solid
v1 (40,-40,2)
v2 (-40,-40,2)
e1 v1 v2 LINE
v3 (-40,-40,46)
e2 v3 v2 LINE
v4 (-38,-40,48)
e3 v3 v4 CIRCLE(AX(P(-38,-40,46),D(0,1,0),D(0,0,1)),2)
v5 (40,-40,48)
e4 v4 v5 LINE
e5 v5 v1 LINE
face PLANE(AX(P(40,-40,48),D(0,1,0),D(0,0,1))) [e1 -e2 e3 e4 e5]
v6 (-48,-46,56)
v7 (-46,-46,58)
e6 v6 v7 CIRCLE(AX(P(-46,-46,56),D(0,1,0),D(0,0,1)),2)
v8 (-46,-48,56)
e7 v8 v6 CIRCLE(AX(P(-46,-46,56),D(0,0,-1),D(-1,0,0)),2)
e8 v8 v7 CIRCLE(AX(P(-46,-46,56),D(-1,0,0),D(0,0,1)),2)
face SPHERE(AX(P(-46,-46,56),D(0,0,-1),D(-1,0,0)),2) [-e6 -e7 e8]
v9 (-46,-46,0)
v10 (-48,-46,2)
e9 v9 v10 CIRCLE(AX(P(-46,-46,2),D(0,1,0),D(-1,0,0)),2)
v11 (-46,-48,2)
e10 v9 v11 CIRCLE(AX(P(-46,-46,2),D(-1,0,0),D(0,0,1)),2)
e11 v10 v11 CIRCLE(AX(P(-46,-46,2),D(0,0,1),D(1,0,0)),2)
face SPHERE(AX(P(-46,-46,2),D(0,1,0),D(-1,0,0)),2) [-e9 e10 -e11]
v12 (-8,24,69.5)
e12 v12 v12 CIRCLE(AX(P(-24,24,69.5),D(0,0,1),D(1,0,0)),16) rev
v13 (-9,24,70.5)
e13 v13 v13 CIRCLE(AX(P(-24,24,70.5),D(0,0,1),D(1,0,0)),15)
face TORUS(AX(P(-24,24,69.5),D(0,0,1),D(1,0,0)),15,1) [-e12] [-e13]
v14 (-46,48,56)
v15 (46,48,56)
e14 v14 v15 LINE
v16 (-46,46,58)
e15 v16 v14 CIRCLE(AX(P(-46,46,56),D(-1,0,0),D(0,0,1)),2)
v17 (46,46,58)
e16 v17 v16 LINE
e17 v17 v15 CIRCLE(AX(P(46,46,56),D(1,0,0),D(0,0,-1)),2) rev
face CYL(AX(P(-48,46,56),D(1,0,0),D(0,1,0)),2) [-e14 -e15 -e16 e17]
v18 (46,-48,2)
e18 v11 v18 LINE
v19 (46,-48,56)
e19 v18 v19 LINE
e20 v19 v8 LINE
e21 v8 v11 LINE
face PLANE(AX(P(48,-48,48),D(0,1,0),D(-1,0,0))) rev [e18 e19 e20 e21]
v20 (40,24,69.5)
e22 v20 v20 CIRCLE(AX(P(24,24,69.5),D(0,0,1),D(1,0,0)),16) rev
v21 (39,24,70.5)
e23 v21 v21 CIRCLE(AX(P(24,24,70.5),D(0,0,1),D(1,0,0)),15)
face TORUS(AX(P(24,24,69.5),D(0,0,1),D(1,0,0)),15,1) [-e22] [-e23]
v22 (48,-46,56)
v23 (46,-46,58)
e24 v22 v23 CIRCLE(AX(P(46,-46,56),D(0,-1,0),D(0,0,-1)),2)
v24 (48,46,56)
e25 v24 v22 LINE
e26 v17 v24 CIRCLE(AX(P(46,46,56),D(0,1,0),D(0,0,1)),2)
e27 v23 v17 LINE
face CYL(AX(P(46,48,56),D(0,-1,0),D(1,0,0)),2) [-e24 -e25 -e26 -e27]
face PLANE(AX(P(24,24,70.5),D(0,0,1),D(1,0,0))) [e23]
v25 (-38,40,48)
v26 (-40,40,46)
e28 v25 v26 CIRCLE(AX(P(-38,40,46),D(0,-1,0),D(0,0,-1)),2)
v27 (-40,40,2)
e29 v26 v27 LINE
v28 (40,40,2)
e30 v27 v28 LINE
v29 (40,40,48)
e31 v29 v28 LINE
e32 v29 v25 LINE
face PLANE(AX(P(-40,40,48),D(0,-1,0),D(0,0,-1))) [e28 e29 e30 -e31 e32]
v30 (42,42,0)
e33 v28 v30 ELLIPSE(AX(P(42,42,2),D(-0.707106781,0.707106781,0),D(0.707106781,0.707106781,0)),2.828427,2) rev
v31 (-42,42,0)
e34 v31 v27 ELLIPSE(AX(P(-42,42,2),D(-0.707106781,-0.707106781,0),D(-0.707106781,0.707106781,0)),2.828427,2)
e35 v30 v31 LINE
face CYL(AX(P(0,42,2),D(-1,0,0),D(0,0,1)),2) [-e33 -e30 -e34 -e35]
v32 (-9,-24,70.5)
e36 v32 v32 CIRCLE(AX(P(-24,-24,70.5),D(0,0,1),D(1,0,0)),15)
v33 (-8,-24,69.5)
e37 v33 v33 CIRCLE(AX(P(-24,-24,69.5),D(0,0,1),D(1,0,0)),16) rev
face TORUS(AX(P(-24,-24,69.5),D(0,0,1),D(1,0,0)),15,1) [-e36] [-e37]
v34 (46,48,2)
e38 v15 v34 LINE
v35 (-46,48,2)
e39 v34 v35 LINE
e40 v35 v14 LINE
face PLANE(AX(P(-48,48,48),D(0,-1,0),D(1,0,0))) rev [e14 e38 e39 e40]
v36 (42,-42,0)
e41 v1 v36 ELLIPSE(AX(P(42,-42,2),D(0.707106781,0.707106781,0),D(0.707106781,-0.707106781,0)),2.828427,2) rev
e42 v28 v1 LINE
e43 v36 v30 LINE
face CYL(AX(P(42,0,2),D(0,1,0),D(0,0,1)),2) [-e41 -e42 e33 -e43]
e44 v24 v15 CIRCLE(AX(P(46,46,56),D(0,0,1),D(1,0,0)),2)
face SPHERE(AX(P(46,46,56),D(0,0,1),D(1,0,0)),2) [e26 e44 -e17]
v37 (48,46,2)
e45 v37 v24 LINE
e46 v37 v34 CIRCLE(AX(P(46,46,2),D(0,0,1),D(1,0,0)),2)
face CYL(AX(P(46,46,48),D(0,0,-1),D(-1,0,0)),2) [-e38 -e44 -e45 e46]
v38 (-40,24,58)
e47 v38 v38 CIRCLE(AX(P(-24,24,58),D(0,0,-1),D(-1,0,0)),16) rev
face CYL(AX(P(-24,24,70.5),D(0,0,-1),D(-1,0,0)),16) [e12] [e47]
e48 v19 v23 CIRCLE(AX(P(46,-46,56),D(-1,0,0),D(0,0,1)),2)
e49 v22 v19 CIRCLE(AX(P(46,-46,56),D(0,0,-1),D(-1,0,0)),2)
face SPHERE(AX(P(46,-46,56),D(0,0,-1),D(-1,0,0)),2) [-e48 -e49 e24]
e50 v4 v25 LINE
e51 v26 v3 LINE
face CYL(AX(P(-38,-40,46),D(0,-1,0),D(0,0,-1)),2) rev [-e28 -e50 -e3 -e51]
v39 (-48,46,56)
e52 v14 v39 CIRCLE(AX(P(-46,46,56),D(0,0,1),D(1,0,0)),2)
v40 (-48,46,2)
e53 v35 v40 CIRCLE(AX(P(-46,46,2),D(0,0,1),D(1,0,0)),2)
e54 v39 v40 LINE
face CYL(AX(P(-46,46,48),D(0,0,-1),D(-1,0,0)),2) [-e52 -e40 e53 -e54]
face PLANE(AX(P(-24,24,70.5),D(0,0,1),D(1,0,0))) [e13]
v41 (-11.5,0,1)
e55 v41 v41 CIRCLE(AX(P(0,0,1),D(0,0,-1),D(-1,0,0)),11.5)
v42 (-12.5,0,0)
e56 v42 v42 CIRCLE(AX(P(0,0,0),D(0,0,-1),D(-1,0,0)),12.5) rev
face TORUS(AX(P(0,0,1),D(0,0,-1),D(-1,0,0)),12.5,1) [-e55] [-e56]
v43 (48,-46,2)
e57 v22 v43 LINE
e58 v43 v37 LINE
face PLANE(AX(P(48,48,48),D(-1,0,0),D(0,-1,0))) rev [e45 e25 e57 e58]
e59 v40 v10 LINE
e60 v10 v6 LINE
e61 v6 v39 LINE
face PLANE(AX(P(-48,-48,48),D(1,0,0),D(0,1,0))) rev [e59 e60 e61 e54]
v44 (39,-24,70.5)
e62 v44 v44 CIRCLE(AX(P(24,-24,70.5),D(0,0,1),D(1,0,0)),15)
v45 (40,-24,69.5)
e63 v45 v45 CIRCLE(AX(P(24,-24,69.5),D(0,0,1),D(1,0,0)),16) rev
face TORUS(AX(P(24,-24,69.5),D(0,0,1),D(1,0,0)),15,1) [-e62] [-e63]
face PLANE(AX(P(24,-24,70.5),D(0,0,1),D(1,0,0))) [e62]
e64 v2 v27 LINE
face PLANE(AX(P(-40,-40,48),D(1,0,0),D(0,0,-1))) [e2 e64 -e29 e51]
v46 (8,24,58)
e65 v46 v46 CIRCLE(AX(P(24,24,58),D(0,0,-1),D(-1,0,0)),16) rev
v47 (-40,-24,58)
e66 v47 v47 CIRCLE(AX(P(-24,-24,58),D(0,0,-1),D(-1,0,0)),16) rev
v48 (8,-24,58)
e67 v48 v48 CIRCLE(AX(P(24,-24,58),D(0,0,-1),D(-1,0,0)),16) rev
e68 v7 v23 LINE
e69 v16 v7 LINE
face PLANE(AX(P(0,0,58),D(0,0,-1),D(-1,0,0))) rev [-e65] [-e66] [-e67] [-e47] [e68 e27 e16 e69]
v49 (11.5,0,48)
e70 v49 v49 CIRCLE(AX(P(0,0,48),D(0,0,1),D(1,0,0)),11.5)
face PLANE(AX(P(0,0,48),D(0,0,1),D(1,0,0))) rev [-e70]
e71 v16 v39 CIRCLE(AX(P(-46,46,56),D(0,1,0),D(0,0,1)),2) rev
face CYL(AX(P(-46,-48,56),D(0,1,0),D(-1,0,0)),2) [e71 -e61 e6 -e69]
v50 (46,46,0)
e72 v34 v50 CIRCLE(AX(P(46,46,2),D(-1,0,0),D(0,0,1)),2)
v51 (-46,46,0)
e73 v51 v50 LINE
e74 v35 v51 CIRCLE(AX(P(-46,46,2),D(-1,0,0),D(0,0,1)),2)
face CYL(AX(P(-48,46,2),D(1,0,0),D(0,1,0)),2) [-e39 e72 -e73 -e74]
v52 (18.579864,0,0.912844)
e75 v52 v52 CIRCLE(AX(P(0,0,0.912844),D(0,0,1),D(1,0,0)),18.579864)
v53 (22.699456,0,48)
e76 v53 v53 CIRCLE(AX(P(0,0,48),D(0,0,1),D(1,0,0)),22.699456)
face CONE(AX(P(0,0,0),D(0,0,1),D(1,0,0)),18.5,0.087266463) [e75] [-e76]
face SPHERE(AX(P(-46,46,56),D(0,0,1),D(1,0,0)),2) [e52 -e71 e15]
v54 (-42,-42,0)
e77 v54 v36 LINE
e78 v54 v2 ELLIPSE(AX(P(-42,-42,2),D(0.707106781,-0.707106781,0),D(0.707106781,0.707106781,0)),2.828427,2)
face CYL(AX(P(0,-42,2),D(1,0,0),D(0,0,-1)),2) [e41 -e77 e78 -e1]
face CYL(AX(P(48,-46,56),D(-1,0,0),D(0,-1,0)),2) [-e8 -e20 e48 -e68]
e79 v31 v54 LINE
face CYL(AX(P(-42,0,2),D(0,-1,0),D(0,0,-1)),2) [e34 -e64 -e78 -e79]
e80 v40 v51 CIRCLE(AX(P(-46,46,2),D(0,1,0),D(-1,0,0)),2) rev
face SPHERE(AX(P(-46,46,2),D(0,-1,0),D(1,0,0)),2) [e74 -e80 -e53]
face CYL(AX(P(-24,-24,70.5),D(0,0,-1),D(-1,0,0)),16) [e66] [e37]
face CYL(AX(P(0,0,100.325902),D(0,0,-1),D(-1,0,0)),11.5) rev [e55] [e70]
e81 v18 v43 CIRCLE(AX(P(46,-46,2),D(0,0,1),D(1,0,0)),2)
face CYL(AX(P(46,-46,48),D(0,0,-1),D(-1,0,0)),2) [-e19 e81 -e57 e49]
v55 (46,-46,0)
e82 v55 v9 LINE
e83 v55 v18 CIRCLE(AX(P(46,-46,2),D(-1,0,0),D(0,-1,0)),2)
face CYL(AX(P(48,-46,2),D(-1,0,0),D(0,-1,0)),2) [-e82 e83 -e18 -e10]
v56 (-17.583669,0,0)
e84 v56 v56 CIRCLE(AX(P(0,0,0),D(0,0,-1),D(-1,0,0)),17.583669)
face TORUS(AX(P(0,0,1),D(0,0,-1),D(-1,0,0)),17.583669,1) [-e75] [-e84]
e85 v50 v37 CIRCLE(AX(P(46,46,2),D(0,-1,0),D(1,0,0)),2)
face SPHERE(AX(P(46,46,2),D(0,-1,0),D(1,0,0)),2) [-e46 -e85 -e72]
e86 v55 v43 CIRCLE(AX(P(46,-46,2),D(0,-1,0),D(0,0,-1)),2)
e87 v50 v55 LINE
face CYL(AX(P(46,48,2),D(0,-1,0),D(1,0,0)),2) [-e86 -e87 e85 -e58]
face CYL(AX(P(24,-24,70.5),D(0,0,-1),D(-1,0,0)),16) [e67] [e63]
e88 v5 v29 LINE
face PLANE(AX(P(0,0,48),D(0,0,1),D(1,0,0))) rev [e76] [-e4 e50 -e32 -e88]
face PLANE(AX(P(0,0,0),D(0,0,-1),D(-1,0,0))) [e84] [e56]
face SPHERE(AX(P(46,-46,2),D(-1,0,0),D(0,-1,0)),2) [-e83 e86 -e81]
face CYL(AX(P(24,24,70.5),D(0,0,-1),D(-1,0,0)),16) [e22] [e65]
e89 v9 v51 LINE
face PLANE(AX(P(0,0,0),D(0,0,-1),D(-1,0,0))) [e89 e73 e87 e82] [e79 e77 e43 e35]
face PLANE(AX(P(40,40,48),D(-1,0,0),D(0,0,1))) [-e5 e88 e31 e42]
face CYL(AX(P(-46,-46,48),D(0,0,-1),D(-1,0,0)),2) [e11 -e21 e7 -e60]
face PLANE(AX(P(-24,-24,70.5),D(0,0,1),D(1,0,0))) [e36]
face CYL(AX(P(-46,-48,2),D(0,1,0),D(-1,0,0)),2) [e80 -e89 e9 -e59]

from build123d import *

# Parameters (mm, degrees)
ESQUISSE1_W        = 96
ESQUISSE1_H        = 96
ESQUISSE1_W_2      = 80
ESQUISSE1_H_2      = 80
BOSS_EXTRU_1_DEPTH = 48
ESQUISSE2_W        = 96
ESQUISSE2_H        = 96
BOSS_EXTRU_3_DEPTH = 10
ESQUISSE3_R        = 16
BOSS_EXTRU_4_DEPTH = 12.5
ESQUISSE4_R        = 18.5
ESQUISSE4_R_2      = 11.5
BOSS_EXTRU_5_DEPTH = 48
CHANFREIN1_SIZE2   = 48
CHANFREIN1_SIZE    = 4.199455849
CONG_1_R           = 2
CONG_2_R           = 2
CONG_3_R           = 2
CONG_4_R           = 2
CONG_5_R           = 1
CONG_6_R           = 1


with BuildPart() as part:
    # Esquisse1 → Boss.-Extru.1 (new body)
    with BuildSketch(Plane.XY):
        Rectangle(ESQUISSE1_W, ESQUISSE1_H)
        Rectangle(ESQUISSE1_W_2, ESQUISSE1_H_2, mode=Mode.SUBTRACT)
    extrude(amount=BOSS_EXTRU_1_DEPTH)

    # Esquisse2 → Boss.-Extru.3 (add)
    with BuildSketch(Plane.XY.offset(48)):
        Rectangle(ESQUISSE2_W, ESQUISSE2_H)
    extrude(amount=BOSS_EXTRU_3_DEPTH)

    # Esquisse3 → Boss.-Extru.4 (add)
    with BuildSketch(Plane.XY.offset(58)):
        with Locations(Location((-24, 24, 0), (0, 0, 180))):
            Circle(ESQUISSE3_R)
        with Locations(Location((24, 24, 0), (0, 0, 180))):
            Circle(ESQUISSE3_R)
        with Locations(Location((24, -24, 0), (0, 0, 180))):
            Circle(ESQUISSE3_R)
        with Locations(Location((-24, -24, 0), (0, 0, 180))):
            Circle(ESQUISSE3_R)
    extrude(amount=BOSS_EXTRU_4_DEPTH)

    # Esquisse4 → Boss.-Extru.5 (add)
    with BuildSketch(Plane(origin=(0, 0, 0), x_dir=(-1, 0, 0), z_dir=(0, 0, -1))):
        Circle(ESQUISSE4_R)
        Circle(ESQUISSE4_R_2, mode=Mode.SUBTRACT)
    extrude(amount=-BOSS_EXTRU_5_DEPTH)

    # Chanfrein1
    chanfrein1_edges = [part.edges().sort_by_distance(p)[0] for p in [
        (18.5, 0, 48),
    ]]
    chanfrein1_side = [part.faces().sort_by_distance(p)[0] for p in [
        (18.583989117, 0, 48),
    ]]
    chamfer(chanfrein1_edges, length=CHANFREIN1_SIZE - 0.0001, length2=CHANFREIN1_SIZE2 - 0.0001, reference=chanfrein1_side[0])  # a hair under: the kernel refuses the full size

    # Congé1
    cong_1_edges = [part.edges().sort_by_distance(p)[0] for p in [
        (-48, 0, 0),
    ]]
    fillet(cong_1_edges, radius=CONG_1_R)

    # Congé2
    cong_2_edges = [part.edges().sort_by_distance(p)[0] for p in [
        (1, -48, 0),
        (-47.414213562, -48, 0.585786438),
        (-48, -48, 30),
    ]]
    fillet(cong_2_edges, radius=CONG_2_R)

    # Congé3
    cong_3_edges = [part.edges().sort_by_distance(p)[0] for p in [
        (48, -48, 30),
        (48, 1, 0),
        (48, -47.414213562, 0.585786438),
    ]]
    fillet(cong_3_edges, radius=CONG_3_R)

    # Congé4
    cong_4_edges = [part.edges().sort_by_distance(p)[0] for p in [
        (-40, 0, 0),
        (0, -40, 0),
        (40, 0, 0),
        (0, 40, 0),
        (-40, 0, 48),
        (0, 48, 58),
        (48, 1, 58),
        (-47.414213562, 48, 0.585786438),
        (-48, 48, 30),
        (48, 48, 30),
        (-48, 1, 58),
        (-47.414213562, -47.414213562, 58),
        (0, -48, 58),
        (47.414213562, -47.414213562, 58),
        (0, 48, 0),
        (47.414213562, 48, 0.585786438),
    ]]
    fillet(cong_4_edges, radius=CONG_4_R)

    # Congé5
    cong_5_edges = [part.edges().sort_by_distance(p)[0] for p in [
        (-8, 24, 70.5),
        (40, 24, 70.5),
        (40, -24, 70.5),
        (-8, -24, 70.5),
    ]]
    fillet(cong_5_edges, radius=CONG_5_R)

    # Congé6
    cong_6_edges = [part.edges().sort_by_distance(p)[0] for p in [
        (11.5, 0, 0),
        (18.5, 0, 0),
    ]]
    fillet(cong_6_edges, radius=CONG_6_R)


solid = part.part
